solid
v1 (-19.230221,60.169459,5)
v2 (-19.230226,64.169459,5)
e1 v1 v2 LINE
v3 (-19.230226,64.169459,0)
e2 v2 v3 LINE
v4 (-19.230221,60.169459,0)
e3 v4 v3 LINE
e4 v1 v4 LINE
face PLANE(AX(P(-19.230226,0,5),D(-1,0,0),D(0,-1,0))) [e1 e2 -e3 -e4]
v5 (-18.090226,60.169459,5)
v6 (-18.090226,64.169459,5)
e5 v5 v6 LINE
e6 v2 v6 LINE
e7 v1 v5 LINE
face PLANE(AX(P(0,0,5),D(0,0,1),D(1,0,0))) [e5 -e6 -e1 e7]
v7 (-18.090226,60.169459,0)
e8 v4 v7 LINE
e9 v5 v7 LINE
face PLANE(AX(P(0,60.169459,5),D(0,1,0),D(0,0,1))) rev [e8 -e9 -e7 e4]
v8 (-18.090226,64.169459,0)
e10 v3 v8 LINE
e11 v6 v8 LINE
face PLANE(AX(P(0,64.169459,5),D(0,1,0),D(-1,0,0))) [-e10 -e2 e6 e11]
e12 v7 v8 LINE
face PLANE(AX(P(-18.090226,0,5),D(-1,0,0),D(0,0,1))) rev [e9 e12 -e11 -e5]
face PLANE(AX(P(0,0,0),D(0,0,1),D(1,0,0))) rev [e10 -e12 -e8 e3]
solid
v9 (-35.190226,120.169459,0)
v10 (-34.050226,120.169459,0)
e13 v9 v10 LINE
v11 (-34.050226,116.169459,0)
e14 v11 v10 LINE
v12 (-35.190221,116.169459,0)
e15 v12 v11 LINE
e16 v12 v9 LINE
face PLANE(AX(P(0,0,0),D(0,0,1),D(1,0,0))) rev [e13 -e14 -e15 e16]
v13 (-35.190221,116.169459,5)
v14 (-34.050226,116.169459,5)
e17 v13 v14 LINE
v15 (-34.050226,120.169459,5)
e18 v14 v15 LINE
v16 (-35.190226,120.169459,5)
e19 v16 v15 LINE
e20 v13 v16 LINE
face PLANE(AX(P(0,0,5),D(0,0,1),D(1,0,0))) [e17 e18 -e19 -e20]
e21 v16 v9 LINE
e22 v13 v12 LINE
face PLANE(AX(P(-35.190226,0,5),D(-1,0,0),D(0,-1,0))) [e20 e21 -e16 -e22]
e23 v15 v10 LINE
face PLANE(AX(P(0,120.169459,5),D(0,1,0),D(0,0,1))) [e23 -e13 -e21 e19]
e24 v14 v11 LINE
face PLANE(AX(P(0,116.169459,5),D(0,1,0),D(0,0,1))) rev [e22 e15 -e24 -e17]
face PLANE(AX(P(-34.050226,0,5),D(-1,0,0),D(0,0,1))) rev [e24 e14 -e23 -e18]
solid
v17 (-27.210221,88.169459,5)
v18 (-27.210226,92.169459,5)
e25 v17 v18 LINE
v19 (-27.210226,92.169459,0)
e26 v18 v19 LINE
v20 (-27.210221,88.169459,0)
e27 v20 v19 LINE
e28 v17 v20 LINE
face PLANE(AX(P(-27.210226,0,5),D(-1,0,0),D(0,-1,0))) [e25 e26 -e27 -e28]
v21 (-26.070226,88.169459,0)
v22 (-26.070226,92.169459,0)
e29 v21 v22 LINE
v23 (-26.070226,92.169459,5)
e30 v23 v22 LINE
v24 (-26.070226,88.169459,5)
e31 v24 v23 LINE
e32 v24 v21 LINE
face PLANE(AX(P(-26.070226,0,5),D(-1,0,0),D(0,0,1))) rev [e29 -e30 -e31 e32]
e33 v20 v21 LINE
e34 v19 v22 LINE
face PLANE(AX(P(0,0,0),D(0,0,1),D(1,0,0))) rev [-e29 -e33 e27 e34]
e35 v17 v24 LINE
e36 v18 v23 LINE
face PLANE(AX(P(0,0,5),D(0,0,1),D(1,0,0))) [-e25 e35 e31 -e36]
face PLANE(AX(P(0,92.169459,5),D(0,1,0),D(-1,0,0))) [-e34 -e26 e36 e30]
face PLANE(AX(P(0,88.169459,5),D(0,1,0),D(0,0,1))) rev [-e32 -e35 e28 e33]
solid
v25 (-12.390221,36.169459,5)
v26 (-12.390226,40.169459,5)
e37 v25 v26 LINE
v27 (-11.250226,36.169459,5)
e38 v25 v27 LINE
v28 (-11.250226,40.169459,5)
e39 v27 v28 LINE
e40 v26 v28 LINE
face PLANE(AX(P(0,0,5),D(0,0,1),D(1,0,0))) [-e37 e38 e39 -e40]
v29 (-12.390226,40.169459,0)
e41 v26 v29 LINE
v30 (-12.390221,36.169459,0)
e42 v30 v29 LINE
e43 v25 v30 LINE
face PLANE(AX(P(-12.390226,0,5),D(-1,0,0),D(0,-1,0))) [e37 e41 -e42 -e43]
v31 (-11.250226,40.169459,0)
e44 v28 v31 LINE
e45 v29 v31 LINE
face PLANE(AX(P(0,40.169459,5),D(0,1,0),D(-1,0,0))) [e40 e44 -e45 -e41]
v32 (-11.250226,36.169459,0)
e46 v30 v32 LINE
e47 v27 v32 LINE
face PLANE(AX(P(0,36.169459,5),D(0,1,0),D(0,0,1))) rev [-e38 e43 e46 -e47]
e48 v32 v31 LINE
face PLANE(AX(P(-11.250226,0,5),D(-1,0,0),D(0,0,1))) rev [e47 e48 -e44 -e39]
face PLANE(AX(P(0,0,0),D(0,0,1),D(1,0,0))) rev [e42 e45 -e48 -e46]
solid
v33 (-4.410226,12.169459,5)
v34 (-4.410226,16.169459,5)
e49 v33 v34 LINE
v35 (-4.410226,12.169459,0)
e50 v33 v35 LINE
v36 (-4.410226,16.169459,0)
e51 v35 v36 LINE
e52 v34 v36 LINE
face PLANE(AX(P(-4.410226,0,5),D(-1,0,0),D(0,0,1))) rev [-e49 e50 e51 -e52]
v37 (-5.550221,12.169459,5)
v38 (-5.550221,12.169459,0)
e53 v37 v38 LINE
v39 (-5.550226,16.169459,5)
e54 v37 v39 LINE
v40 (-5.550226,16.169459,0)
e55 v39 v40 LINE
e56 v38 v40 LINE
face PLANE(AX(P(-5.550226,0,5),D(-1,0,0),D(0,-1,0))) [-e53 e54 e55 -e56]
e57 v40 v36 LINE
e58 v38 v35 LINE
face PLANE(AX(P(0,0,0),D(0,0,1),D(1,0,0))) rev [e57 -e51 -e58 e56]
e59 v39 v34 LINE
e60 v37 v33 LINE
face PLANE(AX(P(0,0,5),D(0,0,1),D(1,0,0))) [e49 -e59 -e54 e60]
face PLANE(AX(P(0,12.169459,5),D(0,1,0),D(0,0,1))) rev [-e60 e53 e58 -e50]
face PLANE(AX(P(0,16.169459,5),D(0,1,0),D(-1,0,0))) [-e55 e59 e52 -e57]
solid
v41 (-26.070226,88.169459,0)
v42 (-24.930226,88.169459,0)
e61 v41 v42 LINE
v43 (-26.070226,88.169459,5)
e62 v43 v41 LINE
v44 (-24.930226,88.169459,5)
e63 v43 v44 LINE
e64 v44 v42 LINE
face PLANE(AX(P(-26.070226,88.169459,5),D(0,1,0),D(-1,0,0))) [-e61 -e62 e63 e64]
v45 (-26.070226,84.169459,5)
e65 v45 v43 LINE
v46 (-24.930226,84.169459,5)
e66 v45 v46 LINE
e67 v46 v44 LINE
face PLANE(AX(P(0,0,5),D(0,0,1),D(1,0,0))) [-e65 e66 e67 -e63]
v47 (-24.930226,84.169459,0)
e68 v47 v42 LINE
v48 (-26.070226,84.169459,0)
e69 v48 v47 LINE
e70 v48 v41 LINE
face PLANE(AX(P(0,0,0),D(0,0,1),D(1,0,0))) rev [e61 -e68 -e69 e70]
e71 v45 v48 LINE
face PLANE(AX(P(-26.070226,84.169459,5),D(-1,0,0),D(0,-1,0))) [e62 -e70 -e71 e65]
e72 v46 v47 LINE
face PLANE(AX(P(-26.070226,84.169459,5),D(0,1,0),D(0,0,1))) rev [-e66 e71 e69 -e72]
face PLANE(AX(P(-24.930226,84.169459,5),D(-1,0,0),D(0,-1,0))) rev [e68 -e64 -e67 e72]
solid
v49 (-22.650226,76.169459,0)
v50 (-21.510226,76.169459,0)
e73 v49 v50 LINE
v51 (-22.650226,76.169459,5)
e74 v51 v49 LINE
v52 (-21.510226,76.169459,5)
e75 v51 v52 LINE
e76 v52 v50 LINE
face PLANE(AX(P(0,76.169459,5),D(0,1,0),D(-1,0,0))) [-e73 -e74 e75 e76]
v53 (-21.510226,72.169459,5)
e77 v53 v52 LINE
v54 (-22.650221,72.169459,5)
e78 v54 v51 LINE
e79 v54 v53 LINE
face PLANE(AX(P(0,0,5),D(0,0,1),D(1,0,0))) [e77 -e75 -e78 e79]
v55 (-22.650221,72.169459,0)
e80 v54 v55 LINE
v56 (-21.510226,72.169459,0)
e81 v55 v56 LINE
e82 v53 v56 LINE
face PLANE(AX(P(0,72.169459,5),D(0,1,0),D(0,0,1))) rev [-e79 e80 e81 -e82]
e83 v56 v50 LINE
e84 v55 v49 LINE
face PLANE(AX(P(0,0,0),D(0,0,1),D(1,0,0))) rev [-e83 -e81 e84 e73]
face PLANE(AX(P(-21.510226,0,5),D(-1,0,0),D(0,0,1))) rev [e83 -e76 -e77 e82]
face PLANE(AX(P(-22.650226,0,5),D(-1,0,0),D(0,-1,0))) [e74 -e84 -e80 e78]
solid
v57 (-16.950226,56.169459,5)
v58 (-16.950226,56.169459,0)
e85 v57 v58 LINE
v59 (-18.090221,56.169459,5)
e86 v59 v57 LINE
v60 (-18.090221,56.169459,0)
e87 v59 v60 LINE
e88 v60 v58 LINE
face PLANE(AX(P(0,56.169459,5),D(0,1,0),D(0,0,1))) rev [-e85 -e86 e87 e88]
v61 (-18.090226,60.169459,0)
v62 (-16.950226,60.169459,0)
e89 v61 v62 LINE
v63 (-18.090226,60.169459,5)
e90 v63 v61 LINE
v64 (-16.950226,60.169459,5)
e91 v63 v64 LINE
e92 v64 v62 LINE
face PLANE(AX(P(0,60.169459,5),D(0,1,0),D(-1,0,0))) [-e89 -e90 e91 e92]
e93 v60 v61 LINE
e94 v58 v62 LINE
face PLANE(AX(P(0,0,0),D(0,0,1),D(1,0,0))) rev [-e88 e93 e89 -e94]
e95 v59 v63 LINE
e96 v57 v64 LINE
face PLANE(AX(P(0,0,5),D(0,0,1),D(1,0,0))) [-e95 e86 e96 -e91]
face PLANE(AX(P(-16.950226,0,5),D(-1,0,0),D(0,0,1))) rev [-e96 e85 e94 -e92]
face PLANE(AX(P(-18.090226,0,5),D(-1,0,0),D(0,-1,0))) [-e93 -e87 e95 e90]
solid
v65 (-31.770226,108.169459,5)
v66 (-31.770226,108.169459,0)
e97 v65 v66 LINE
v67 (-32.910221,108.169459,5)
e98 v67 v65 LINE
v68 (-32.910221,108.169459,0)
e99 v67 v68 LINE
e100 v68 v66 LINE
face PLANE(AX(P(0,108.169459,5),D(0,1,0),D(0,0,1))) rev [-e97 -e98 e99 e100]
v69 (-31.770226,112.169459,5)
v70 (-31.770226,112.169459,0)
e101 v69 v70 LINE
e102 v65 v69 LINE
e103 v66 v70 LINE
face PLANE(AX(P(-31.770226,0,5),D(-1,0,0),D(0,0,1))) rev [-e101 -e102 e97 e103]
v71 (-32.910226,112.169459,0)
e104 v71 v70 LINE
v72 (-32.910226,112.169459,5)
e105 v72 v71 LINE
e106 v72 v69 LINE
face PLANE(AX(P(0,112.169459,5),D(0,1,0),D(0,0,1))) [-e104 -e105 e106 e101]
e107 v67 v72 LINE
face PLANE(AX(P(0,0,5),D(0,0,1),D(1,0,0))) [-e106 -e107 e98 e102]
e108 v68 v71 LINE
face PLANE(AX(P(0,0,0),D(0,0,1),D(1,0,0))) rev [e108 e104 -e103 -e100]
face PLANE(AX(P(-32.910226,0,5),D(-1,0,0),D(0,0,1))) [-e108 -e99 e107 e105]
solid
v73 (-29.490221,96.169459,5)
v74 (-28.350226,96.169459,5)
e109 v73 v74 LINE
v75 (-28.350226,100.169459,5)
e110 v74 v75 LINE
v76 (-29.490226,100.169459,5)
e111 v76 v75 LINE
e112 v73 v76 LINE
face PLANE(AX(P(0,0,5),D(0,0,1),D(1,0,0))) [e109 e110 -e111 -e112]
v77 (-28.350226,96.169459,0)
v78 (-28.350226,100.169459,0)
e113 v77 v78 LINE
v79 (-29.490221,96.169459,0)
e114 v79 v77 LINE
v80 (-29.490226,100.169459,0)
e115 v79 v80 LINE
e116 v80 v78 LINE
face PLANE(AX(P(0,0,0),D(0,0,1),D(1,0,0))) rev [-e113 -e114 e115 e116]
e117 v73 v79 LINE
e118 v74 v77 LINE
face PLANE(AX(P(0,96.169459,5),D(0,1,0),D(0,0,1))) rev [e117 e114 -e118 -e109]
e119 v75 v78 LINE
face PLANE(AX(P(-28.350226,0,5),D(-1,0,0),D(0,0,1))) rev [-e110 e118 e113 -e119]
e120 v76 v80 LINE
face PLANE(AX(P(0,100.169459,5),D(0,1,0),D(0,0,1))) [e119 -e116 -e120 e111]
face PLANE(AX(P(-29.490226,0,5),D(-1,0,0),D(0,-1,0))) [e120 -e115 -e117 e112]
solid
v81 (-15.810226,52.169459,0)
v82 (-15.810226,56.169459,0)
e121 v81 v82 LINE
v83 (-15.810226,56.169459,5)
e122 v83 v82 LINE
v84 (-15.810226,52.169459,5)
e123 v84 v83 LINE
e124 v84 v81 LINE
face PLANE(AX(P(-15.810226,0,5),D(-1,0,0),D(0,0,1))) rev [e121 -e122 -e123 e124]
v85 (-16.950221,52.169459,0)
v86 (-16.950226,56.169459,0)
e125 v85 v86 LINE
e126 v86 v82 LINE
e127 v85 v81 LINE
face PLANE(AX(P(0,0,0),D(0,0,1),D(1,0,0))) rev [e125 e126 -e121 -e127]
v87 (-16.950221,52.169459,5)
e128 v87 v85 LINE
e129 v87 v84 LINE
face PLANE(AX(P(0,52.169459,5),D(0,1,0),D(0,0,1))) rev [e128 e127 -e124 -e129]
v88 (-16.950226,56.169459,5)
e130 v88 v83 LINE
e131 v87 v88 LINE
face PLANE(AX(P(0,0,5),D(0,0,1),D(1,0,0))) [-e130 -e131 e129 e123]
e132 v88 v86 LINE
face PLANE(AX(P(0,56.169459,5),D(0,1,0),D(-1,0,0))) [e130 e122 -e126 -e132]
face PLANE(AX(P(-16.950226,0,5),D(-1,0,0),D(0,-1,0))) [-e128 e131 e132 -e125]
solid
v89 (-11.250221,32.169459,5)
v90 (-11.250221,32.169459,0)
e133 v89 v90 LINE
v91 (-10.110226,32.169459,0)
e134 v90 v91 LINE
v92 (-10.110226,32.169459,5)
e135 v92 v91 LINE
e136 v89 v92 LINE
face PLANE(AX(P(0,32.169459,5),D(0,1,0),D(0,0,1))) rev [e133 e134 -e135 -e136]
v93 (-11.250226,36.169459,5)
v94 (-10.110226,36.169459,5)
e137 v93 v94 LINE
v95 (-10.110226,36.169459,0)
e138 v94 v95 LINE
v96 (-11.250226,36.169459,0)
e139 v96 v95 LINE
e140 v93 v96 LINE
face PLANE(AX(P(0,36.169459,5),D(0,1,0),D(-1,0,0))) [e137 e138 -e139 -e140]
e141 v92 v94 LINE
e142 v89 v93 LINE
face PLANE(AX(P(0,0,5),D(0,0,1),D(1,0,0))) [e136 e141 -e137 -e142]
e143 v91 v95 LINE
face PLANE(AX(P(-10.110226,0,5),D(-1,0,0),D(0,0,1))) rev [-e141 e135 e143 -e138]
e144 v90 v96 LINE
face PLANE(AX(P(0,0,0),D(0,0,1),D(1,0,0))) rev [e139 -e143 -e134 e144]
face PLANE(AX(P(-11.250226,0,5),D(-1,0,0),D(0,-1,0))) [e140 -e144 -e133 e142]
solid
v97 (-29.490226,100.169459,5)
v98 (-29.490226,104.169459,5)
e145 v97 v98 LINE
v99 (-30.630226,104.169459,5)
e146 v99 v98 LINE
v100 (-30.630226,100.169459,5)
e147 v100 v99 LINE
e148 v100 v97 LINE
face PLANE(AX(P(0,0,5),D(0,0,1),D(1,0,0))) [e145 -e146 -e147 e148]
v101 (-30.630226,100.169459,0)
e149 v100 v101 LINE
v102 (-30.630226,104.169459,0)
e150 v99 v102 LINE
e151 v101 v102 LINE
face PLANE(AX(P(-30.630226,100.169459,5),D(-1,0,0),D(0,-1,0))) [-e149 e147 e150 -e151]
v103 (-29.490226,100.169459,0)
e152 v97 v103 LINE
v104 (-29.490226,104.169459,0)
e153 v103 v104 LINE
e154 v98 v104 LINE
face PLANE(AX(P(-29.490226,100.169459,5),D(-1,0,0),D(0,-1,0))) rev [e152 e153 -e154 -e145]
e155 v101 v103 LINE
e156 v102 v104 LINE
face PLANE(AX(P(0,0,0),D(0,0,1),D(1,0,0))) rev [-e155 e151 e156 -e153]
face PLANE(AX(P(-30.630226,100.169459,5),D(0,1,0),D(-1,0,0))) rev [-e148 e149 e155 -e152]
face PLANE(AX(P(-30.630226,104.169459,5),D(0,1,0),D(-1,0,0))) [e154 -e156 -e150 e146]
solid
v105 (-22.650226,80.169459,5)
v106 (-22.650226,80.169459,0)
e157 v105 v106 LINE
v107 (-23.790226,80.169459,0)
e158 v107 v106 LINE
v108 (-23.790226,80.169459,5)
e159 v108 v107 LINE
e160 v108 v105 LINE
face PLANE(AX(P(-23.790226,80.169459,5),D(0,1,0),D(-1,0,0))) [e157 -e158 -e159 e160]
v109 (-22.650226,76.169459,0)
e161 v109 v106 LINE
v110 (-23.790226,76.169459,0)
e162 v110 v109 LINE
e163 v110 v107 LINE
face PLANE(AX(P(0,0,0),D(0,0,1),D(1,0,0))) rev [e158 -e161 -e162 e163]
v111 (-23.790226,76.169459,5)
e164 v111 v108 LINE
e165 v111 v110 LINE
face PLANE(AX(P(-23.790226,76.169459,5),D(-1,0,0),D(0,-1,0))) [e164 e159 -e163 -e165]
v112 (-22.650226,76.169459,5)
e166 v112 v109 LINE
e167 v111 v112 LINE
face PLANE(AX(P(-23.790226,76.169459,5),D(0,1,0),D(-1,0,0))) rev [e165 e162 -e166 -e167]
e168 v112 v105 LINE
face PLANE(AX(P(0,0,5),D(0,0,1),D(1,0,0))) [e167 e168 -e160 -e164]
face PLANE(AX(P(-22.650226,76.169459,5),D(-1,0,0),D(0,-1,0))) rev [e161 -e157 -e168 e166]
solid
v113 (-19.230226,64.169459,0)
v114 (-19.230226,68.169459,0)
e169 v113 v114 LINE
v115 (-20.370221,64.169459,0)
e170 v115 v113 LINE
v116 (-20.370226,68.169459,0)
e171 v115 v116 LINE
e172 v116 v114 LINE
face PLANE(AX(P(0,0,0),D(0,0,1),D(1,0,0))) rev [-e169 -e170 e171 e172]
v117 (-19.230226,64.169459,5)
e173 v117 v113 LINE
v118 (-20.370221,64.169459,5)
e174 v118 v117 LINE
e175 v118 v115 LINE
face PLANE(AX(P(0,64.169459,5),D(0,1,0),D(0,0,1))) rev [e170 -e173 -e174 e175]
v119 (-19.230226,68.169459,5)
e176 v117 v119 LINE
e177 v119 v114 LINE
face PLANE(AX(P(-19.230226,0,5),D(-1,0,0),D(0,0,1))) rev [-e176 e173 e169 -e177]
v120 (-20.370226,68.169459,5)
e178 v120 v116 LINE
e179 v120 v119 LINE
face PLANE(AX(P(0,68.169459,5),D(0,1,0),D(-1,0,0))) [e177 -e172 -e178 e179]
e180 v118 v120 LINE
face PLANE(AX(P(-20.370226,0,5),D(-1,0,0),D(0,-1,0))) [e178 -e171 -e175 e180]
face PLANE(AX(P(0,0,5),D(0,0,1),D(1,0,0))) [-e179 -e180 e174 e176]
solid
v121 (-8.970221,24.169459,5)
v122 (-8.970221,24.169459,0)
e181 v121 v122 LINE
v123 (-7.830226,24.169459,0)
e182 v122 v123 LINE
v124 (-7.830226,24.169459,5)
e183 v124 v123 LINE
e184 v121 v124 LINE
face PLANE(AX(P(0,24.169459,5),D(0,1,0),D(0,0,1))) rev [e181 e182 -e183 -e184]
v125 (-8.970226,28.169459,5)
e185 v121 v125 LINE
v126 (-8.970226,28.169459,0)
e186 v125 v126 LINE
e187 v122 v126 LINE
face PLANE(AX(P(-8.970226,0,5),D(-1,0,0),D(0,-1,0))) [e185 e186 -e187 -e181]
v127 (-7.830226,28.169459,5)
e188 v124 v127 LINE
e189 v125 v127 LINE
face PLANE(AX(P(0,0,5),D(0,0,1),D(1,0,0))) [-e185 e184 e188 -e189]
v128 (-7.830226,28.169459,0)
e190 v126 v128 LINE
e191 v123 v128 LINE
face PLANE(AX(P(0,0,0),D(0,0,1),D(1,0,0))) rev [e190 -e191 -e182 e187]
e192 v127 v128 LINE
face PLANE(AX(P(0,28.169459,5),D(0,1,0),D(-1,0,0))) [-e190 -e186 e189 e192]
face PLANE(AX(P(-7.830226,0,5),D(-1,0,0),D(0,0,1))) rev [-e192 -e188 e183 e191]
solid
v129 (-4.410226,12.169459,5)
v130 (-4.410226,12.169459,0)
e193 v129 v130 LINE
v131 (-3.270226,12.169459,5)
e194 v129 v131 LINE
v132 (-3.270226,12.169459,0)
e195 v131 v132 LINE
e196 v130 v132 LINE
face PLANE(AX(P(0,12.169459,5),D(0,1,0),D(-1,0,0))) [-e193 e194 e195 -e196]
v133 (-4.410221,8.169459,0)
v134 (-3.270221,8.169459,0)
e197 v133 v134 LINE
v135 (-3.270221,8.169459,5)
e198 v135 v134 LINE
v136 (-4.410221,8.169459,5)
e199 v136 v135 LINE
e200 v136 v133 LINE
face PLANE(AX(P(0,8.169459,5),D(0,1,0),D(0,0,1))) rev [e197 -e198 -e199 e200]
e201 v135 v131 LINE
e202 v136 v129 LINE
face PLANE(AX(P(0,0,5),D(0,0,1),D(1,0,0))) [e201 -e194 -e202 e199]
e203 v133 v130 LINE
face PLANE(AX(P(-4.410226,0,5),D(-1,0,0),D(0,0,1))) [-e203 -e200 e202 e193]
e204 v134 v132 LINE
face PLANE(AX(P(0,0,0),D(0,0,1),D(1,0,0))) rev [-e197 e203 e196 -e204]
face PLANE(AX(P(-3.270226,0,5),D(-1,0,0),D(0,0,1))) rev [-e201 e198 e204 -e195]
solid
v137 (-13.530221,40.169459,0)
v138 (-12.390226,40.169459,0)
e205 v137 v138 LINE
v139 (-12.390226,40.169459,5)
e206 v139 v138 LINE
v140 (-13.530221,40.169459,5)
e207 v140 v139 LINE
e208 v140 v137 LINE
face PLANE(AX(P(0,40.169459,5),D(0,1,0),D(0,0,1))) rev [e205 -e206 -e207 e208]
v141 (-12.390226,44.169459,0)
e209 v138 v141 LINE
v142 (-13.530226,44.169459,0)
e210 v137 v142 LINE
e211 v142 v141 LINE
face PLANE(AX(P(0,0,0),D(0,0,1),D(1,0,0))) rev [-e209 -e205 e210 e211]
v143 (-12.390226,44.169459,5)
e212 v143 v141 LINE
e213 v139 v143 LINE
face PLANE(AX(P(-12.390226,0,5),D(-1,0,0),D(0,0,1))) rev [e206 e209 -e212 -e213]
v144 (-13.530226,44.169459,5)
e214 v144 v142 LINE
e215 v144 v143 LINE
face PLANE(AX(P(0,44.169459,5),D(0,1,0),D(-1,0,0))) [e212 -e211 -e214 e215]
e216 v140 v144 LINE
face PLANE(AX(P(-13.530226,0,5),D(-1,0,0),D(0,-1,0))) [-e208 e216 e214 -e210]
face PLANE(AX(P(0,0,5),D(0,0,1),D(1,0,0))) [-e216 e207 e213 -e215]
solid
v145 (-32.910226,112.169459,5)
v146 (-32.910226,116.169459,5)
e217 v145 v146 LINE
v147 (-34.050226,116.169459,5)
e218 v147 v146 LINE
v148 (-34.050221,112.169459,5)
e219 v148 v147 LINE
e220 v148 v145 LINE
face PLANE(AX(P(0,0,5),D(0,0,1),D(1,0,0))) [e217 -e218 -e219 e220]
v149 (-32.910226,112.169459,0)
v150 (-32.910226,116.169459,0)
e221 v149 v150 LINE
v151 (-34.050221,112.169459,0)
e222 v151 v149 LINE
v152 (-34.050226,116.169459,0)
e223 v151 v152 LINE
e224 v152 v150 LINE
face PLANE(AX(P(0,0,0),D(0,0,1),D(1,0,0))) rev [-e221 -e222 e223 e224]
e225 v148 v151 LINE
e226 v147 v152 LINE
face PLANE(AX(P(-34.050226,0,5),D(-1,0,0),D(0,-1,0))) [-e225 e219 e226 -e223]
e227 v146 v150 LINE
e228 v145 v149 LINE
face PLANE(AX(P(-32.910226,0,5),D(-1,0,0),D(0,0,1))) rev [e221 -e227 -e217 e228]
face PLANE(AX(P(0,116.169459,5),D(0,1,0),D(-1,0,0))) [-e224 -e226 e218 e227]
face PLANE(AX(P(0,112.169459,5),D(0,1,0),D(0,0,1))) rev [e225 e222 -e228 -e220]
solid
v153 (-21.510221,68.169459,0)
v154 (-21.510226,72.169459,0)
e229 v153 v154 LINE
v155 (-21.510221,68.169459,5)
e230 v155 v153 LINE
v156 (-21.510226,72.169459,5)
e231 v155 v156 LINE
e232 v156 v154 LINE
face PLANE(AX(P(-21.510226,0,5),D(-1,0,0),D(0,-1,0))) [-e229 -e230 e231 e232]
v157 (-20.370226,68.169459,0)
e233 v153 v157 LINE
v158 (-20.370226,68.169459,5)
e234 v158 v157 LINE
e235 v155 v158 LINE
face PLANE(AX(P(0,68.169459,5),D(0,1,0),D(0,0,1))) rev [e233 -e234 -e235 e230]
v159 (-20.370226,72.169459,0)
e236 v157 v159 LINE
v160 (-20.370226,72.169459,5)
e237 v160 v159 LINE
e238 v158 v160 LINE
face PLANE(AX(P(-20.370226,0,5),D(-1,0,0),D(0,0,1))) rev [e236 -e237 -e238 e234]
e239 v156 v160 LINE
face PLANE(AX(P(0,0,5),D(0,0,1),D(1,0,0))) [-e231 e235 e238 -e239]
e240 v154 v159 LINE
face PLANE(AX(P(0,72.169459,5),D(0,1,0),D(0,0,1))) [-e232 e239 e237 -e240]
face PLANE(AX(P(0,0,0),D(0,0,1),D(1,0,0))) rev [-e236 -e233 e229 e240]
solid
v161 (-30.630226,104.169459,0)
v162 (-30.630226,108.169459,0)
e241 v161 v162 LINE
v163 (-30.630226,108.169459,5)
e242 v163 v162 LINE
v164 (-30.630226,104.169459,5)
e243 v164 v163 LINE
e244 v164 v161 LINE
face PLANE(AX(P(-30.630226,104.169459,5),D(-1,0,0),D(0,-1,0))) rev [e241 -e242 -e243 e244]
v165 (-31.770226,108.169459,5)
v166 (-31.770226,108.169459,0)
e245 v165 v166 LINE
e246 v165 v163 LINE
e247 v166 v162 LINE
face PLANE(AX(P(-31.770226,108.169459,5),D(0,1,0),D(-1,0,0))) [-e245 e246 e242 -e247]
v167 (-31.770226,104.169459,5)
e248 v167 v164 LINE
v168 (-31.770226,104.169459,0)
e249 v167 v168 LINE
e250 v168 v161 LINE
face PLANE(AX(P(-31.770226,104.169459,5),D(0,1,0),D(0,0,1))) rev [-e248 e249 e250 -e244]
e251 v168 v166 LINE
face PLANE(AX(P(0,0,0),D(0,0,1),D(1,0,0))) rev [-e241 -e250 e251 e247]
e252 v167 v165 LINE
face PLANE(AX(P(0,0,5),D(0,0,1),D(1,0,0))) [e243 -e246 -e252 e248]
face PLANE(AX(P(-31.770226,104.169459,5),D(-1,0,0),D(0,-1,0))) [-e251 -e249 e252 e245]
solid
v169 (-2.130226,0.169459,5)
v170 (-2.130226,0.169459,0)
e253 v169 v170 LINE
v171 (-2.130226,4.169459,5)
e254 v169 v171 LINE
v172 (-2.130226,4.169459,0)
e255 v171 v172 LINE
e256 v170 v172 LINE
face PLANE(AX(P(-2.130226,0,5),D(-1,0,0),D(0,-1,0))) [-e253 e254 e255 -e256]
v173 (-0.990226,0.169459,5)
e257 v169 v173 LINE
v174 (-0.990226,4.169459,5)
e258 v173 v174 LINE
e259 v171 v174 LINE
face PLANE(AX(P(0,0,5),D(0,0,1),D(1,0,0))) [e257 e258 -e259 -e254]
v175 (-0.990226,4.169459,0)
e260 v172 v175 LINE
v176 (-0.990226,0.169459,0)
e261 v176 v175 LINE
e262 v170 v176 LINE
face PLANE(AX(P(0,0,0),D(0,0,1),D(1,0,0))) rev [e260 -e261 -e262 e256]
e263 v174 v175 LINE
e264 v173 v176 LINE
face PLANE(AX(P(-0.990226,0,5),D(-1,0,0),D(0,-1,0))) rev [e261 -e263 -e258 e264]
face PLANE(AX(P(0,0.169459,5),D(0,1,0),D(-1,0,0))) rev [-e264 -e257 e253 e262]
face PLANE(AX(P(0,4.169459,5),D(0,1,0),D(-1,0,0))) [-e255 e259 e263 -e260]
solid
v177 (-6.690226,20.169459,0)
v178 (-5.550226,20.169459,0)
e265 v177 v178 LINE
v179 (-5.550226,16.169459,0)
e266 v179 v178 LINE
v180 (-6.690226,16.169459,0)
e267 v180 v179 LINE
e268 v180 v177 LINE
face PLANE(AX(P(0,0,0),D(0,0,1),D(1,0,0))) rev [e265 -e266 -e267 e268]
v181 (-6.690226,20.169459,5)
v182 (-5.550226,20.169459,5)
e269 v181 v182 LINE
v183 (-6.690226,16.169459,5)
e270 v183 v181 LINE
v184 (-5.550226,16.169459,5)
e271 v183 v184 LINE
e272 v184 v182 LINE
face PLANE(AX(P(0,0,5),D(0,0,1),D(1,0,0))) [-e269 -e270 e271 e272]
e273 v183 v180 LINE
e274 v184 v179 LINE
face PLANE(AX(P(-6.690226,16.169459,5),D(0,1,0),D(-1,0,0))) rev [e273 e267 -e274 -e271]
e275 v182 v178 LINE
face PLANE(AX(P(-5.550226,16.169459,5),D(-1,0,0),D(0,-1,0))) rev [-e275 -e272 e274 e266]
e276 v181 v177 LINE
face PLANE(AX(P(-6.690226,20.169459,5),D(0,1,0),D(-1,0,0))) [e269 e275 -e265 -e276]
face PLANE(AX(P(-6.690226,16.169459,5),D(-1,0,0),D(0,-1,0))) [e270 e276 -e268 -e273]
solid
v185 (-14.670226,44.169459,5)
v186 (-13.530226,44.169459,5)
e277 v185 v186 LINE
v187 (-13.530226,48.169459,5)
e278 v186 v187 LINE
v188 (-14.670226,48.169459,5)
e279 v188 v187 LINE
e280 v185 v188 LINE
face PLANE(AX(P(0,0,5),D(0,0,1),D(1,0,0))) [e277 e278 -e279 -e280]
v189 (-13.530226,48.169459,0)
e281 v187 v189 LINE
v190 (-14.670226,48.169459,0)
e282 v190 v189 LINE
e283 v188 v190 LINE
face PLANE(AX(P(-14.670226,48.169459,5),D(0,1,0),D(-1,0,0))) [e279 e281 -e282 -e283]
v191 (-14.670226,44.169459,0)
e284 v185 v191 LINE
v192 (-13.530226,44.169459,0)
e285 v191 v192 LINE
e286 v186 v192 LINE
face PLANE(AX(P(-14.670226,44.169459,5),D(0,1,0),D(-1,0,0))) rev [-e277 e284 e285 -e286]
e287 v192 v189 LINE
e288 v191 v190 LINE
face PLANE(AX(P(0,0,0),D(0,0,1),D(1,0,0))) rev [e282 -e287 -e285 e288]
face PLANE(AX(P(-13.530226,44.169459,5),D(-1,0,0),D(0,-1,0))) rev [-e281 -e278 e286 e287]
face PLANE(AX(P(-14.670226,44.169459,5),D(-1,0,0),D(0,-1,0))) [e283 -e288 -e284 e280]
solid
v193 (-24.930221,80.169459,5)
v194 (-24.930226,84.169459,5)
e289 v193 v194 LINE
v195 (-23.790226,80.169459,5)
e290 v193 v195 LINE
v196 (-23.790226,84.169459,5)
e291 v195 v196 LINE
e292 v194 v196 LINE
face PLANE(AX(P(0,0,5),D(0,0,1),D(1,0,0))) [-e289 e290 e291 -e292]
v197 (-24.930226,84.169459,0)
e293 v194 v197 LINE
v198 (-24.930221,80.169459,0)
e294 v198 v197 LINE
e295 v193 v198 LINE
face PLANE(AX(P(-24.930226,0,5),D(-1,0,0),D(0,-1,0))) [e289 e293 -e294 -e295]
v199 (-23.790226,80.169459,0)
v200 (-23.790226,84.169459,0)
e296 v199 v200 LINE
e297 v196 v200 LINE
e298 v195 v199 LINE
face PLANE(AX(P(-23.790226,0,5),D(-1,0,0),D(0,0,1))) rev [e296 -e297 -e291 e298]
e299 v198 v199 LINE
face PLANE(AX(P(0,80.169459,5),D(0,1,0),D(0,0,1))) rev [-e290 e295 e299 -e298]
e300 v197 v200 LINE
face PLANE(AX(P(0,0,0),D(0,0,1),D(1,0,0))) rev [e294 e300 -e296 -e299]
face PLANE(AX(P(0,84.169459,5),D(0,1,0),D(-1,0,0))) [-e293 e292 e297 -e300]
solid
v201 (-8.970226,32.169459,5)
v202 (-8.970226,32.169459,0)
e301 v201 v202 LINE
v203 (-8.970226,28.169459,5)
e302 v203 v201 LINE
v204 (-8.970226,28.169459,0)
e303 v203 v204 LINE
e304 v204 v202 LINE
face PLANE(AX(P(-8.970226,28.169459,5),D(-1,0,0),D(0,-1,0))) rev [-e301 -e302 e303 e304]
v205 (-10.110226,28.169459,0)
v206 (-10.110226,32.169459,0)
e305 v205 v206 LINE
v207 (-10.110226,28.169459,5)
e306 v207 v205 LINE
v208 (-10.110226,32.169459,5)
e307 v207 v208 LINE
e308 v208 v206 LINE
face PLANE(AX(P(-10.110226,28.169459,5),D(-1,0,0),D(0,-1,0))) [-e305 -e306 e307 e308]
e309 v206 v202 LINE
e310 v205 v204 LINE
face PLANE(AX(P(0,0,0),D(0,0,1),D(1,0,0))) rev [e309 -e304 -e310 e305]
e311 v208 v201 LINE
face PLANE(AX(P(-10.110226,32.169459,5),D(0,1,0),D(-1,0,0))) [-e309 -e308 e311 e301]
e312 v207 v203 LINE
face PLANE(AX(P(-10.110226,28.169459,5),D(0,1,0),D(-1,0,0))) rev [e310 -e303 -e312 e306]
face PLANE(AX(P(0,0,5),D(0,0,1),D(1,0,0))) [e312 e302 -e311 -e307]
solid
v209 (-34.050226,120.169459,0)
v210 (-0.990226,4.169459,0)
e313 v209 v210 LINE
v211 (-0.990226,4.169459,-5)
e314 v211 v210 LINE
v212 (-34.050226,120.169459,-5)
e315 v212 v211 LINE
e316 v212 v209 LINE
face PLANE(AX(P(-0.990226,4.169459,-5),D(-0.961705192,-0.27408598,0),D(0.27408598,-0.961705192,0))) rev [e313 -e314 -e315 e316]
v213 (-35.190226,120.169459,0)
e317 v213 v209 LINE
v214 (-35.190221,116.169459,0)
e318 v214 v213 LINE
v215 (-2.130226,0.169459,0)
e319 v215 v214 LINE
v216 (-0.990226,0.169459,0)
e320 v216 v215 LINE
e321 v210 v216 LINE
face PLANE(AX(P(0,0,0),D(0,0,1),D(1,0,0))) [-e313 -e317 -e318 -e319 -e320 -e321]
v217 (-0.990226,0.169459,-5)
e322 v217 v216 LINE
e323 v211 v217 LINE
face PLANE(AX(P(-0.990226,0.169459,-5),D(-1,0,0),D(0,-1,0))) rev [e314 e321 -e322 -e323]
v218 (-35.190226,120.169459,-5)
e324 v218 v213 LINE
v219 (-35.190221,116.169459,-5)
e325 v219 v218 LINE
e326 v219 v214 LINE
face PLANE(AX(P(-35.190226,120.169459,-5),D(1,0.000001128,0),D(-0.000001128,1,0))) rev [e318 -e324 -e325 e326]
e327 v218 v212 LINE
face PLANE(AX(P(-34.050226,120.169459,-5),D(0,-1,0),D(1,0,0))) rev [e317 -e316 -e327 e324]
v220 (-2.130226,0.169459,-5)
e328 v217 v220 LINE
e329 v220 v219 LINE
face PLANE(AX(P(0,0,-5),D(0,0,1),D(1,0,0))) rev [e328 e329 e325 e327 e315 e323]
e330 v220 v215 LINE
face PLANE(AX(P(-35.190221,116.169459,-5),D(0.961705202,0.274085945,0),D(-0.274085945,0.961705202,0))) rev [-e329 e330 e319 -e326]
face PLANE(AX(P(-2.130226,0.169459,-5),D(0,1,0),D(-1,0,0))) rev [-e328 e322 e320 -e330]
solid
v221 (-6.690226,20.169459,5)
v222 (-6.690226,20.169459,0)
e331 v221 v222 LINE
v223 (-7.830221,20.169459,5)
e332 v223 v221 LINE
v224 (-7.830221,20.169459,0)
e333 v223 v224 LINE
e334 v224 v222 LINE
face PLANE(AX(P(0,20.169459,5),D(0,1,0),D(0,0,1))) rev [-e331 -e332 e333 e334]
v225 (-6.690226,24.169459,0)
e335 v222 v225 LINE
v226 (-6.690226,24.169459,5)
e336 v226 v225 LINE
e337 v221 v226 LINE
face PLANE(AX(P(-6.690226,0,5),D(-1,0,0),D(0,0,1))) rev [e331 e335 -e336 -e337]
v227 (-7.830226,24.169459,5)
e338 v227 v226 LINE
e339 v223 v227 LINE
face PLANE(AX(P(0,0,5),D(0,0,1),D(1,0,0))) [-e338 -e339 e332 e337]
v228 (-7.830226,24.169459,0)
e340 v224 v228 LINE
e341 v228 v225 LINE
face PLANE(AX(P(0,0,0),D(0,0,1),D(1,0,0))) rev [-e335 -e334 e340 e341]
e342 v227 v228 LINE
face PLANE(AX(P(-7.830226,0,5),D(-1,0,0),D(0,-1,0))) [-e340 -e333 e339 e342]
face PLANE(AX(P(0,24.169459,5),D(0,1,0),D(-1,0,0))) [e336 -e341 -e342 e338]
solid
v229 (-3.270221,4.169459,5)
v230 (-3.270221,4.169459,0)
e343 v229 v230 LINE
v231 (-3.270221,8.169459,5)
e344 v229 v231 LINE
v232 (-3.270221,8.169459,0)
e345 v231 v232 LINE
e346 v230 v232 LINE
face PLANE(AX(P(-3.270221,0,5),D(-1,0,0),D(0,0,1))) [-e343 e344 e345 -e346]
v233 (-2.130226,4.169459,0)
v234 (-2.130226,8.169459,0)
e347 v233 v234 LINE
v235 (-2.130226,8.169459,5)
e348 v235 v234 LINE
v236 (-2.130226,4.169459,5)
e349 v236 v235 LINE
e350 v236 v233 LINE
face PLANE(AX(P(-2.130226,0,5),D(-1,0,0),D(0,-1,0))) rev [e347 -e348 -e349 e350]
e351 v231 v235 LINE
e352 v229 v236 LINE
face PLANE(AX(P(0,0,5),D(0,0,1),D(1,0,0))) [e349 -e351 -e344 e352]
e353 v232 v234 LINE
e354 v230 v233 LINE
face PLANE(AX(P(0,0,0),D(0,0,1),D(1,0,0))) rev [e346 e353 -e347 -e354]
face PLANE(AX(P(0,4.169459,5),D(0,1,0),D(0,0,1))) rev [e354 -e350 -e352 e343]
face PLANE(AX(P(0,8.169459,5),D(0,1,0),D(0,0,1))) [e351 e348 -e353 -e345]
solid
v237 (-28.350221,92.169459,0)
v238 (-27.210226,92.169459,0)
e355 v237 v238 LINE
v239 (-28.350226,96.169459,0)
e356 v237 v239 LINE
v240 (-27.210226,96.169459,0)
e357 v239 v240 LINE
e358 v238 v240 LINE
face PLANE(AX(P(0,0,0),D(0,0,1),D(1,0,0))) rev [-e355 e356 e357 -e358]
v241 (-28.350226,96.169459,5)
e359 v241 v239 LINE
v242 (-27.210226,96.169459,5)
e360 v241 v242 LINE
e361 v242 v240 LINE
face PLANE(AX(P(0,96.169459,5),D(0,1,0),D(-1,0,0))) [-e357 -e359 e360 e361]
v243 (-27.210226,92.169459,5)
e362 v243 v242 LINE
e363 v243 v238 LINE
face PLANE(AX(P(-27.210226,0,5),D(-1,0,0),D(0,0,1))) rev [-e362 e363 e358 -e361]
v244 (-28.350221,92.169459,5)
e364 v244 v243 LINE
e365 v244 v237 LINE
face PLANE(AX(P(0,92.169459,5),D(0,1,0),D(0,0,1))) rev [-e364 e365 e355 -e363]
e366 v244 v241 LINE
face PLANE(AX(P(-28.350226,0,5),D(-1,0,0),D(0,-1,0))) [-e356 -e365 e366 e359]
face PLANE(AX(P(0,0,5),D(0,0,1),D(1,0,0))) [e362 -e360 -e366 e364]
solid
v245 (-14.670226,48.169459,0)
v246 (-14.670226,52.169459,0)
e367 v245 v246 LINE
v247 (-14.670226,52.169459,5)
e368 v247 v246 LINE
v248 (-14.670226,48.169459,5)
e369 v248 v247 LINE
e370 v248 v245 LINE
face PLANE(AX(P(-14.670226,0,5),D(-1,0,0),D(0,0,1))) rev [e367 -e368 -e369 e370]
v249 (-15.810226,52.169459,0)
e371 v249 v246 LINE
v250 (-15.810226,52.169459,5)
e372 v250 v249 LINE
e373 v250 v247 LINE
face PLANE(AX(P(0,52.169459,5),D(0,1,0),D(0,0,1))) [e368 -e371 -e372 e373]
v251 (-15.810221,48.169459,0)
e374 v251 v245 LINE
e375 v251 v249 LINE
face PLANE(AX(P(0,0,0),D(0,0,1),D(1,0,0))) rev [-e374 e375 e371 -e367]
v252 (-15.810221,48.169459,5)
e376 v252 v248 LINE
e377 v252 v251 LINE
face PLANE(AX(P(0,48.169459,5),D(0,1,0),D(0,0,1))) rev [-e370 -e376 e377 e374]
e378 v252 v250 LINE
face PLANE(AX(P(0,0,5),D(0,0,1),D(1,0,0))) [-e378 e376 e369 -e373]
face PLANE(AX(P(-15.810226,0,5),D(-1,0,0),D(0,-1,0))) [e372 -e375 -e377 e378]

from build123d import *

# Parameters (mm, degrees)
SKETCH2_W              = 1.139995489
SKETCH2_H              = 4
BOSS_EXTRUDE1_DEPTH    = 5
SKETCH2_W_2            = 1.14
BOSS_EXTRUDE1_2_DEPTH  = 5
BOSS_EXTRUDE1_3_DEPTH  = 5
BOSS_EXTRUDE1_4_DEPTH  = 5
BOSS_EXTRUDE1_5_DEPTH  = 5
BOSS_EXTRUDE1_6_DEPTH  = 5
BOSS_EXTRUDE1_7_DEPTH  = 5
BOSS_EXTRUDE1_8_DEPTH  = 5
BOSS_EXTRUDE1_9_DEPTH  = 5
BOSS_EXTRUDE1_10_DEPTH = 5
BOSS_EXTRUDE1_11_DEPTH = 5
BOSS_EXTRUDE1_12_DEPTH = 5
BOSS_EXTRUDE1_13_DEPTH = 5
BOSS_EXTRUDE1_14_DEPTH = 5
BOSS_EXTRUDE1_15_DEPTH = 5
BOSS_EXTRUDE1_16_DEPTH = 5
BOSS_EXTRUDE1_17_DEPTH = 5
BOSS_EXTRUDE1_18_DEPTH = 5
BOSS_EXTRUDE1_19_DEPTH = 5
BOSS_EXTRUDE1_20_DEPTH = 5
BOSS_EXTRUDE1_21_DEPTH = 5
BOSS_EXTRUDE1_22_DEPTH = 5
BOSS_EXTRUDE1_23_DEPTH = 5
BOSS_EXTRUDE1_24_DEPTH = 5
BOSS_EXTRUDE1_25_DEPTH = 5
BOSS_EXTRUDE1_26_DEPTH = 5
BOSS_EXTRUDE1_27_DEPTH = 5
BOSS_EXTRUDE1_28_DEPTH = 5
BOSS_EXTRUDE1_29_DEPTH = 5
BOSS_EXTRUDE1_30_DEPTH = 5
BOSS_EXTRUDE3_DEPTH    = 5


with BuildPart() as part:
    # Sketch2 → Boss-Extrude1 (new body)
    with BuildSketch(Plane.XY):
        with Locations((-1.560223433, 2.169459459)):
            Rectangle(SKETCH2_W, SKETCH2_H)
    extrude(amount=BOSS_EXTRUDE1_DEPTH)


with BuildPart() as body_2:
    # Sketch2 → Boss-Extrude1 2 (new body)
    with BuildSketch(Plane.XY):
        with Locations((-34.620225688, 118.169459459)):
            Rectangle(SKETCH2_W_2, SKETCH2_H)
    extrude(amount=BOSS_EXTRUDE1_2_DEPTH)


with BuildPart() as body_3:
    # Sketch2 → Boss-Extrude1 3 (new body)
    with BuildSketch(Plane.XY):
        with Locations((-33.480225688, 114.169459459)):
            Rectangle(SKETCH2_W_2, SKETCH2_H)
    extrude(amount=BOSS_EXTRUDE1_3_DEPTH)


with BuildPart() as body_4:
    # Sketch2 → Boss-Extrude1 4 (new body)
    with BuildSketch(Plane.XY):
        with Locations((-32.340225688, 110.169459459)):
            Rectangle(SKETCH2_W_2, SKETCH2_H)
    extrude(amount=BOSS_EXTRUDE1_4_DEPTH)


with BuildPart() as body_5:
    # Sketch2 → Boss-Extrude1 5 (new body)
    with BuildSketch(Plane.XY):
        with Locations((-31.200225688, 106.169459459)):
            Rectangle(SKETCH2_W_2, SKETCH2_H)
    extrude(amount=BOSS_EXTRUDE1_5_DEPTH)


with BuildPart() as body_6:
    # Sketch2 → Boss-Extrude1 6 (new body)
    with BuildSketch(Plane.XY):
        with Locations((-30.060225688, 102.169459459)):
            Rectangle(SKETCH2_W_2, SKETCH2_H)
    extrude(amount=BOSS_EXTRUDE1_6_DEPTH)


with BuildPart() as body_7:
    # Sketch2 → Boss-Extrude1 7 (new body)
    with BuildSketch(Plane.XY):
        with Locations((-28.920225688, 98.169459459)):
            Rectangle(SKETCH2_W_2, SKETCH2_H)
    extrude(amount=BOSS_EXTRUDE1_7_DEPTH)


with BuildPart() as body_8:
    # Sketch2 → Boss-Extrude1 8 (new body)
    with BuildSketch(Plane.XY):
        with Locations((-27.780225688, 94.169459459)):
            Rectangle(SKETCH2_W_2, SKETCH2_H)
    extrude(amount=BOSS_EXTRUDE1_8_DEPTH)


with BuildPart() as body_9:
    # Sketch2 → Boss-Extrude1 9 (new body)
    with BuildSketch(Plane.XY):
        with Locations((-26.640225688, 90.169459459)):
            Rectangle(SKETCH2_W_2, SKETCH2_H)
    extrude(amount=BOSS_EXTRUDE1_9_DEPTH)


with BuildPart() as body_10:
    # Sketch2 → Boss-Extrude1 10 (new body)
    with BuildSketch(Plane.XY):
        with Locations((-25.500225688, 86.169459459)):
            Rectangle(SKETCH2_W_2, SKETCH2_H)
    extrude(amount=BOSS_EXTRUDE1_10_DEPTH)


with BuildPart() as body_11:
    # Sketch2 → Boss-Extrude1 11 (new body)
    with BuildSketch(Plane.XY):
        with Locations((-24.360225688, 82.169459459)):
            Rectangle(SKETCH2_W_2, SKETCH2_H)
    extrude(amount=BOSS_EXTRUDE1_11_DEPTH)


with BuildPart() as body_12:
    # Sketch2 → Boss-Extrude1 12 (new body)
    with BuildSketch(Plane.XY):
        with Locations((-23.220225688, 78.169459459)):
            Rectangle(SKETCH2_W_2, SKETCH2_H)
    extrude(amount=BOSS_EXTRUDE1_12_DEPTH)


with BuildPart() as body_13:
    # Sketch2 → Boss-Extrude1 13 (new body)
    with BuildSketch(Plane.XY):
        with Locations((-22.080225688, 74.169459459)):
            Rectangle(SKETCH2_W_2, SKETCH2_H)
    extrude(amount=BOSS_EXTRUDE1_13_DEPTH)


with BuildPart() as body_14:
    # Sketch2 → Boss-Extrude1 14 (new body)
    with BuildSketch(Plane.XY):
        with Locations((-20.940225688, 70.169459459)):
            Rectangle(SKETCH2_W_2, SKETCH2_H)
    extrude(amount=BOSS_EXTRUDE1_14_DEPTH)


with BuildPart() as body_15:
    # Sketch2 → Boss-Extrude1 15 (new body)
    with BuildSketch(Plane.XY):
        with Locations((-19.800225688, 66.169459459)):
            Rectangle(SKETCH2_W_2, SKETCH2_H)
    extrude(amount=BOSS_EXTRUDE1_15_DEPTH)


with BuildPart() as body_16:
    # Sketch2 → Boss-Extrude1 16 (new body)
    with BuildSketch(Plane.XY):
        with Locations((-18.660225688, 62.169459459)):
            Rectangle(SKETCH2_W_2, SKETCH2_H)
    extrude(amount=BOSS_EXTRUDE1_16_DEPTH)


with BuildPart() as body_17:
    # Sketch2 → Boss-Extrude1 17 (new body)
    with BuildSketch(Plane.XY):
        with Locations((-17.520225688, 58.169459459)):
            Rectangle(SKETCH2_W_2, SKETCH2_H)
    extrude(amount=BOSS_EXTRUDE1_17_DEPTH)


with BuildPart() as body_18:
    # Sketch2 → Boss-Extrude1 18 (new body)
    with BuildSketch(Plane.XY):
        with Locations((-16.380225688, 54.169459459)):
            Rectangle(SKETCH2_W_2, SKETCH2_H)
    extrude(amount=BOSS_EXTRUDE1_18_DEPTH)


with BuildPart() as body_19:
    # Sketch2 → Boss-Extrude1 19 (new body)
    with BuildSketch(Plane.XY):
        with Locations((-15.240225688, 50.169459459)):
            Rectangle(SKETCH2_W_2, SKETCH2_H)
    extrude(amount=BOSS_EXTRUDE1_19_DEPTH)


with BuildPart() as body_20:
    # Sketch2 → Boss-Extrude1 20 (new body)
    with BuildSketch(Plane.XY):
        with Locations((-14.100225688, 46.169459459)):
            Rectangle(SKETCH2_W_2, SKETCH2_H)
    extrude(amount=BOSS_EXTRUDE1_20_DEPTH)


with BuildPart() as body_21:
    # Sketch2 → Boss-Extrude1 21 (new body)
    with BuildSketch(Plane.XY):
        with Locations((-12.960225688, 42.169459459)):
            Rectangle(SKETCH2_W_2, SKETCH2_H)
    extrude(amount=BOSS_EXTRUDE1_21_DEPTH)


with BuildPart() as body_22:
    # Sketch2 → Boss-Extrude1 22 (new body)
    with BuildSketch(Plane.XY):
        with Locations((-11.820225688, 38.169459459)):
            Rectangle(SKETCH2_W_2, SKETCH2_H)
    extrude(amount=BOSS_EXTRUDE1_22_DEPTH)


with BuildPart() as body_23:
    # Sketch2 → Boss-Extrude1 23 (new body)
    with BuildSketch(Plane.XY):
        with Locations((-10.680225688, 34.169459459)):
            Rectangle(SKETCH2_W_2, SKETCH2_H)
    extrude(amount=BOSS_EXTRUDE1_23_DEPTH)


with BuildPart() as body_24:
    # Sketch2 → Boss-Extrude1 24 (new body)
    with BuildSketch(Plane.XY):
        with Locations((-9.540225688, 30.169459459)):
            Rectangle(SKETCH2_W_2, SKETCH2_H)
    extrude(amount=BOSS_EXTRUDE1_24_DEPTH)


with BuildPart() as body_25:
    # Sketch2 → Boss-Extrude1 25 (new body)
    with BuildSketch(Plane.XY):
        with Locations((-8.400225688, 26.169459459)):
            Rectangle(SKETCH2_W_2, SKETCH2_H)
    extrude(amount=BOSS_EXTRUDE1_25_DEPTH)


with BuildPart() as body_26:
    # Sketch2 → Boss-Extrude1 26 (new body)
    with BuildSketch(Plane.XY):
        with Locations((-7.260225688, 22.169459459)):
            Rectangle(SKETCH2_W_2, SKETCH2_H)
    extrude(amount=BOSS_EXTRUDE1_26_DEPTH)


with BuildPart() as body_27:
    # Sketch2 → Boss-Extrude1 27 (new body)
    with BuildSketch(Plane.XY):
        with Locations((-6.120225688, 18.169459459)):
            Rectangle(SKETCH2_W_2, SKETCH2_H)
    extrude(amount=BOSS_EXTRUDE1_27_DEPTH)


with BuildPart() as body_28:
    # Sketch2 → Boss-Extrude1 28 (new body)
    with BuildSketch(Plane.XY):
        with Locations((-4.980225688, 14.169459459)):
            Rectangle(SKETCH2_W_2, SKETCH2_H)
    extrude(amount=BOSS_EXTRUDE1_28_DEPTH)


with BuildPart() as body_29:
    # Sketch2 → Boss-Extrude1 29 (new body)
    with BuildSketch(Plane.XY):
        Polygon((-3.270221177, 4.169459459), (-2.130221177, 4.169459459), (-2.130221177, 8.169459459), (-3.270225688, 8.169459459), align=None)
    extrude(amount=BOSS_EXTRUDE1_29_DEPTH)


with BuildPart() as body_30:
    # Sketch2 → Boss-Extrude1 30 (new body)
    with BuildSketch(Plane.XY):
        with Locations((-3.840225688, 10.169459459)):
            Rectangle(SKETCH2_W_2, SKETCH2_H)
    extrude(amount=BOSS_EXTRUDE1_30_DEPTH)


with BuildPart() as body_31:
    # Sketch3 → Boss-Extrude3 (new body)
    with BuildSketch(Plane(origin=(0, 0, 0), x_dir=(-1, 0, 0), z_dir=(0, 0, -1))):
        Polygon((0.990225688, 4.169459459), (34.050225688, 120.169459459), (35.190225688, 120.169459459), (35.190221177, 116.169459459), (2.130225688, 0.169459459), (0.990225688, 0.169459459), align=None)
    extrude(amount=BOSS_EXTRUDE3_DEPTH)


solid = Compound([part.part, body_2.part, body_3.part, body_4.part, body_5.part, body_6.part, body_7.part, body_8.part, body_9.part, body_10.part, body_11.part, body_12.part, body_13.part, body_14.part, body_15.part, body_16.part, body_17.part, body_18.part, body_19.part, body_20.part, body_21.part, body_22.part, body_23.part, body_24.part, body_25.part, body_26.part, body_27.part, body_28.part, body_29.part, body_30.part, body_31.part])
